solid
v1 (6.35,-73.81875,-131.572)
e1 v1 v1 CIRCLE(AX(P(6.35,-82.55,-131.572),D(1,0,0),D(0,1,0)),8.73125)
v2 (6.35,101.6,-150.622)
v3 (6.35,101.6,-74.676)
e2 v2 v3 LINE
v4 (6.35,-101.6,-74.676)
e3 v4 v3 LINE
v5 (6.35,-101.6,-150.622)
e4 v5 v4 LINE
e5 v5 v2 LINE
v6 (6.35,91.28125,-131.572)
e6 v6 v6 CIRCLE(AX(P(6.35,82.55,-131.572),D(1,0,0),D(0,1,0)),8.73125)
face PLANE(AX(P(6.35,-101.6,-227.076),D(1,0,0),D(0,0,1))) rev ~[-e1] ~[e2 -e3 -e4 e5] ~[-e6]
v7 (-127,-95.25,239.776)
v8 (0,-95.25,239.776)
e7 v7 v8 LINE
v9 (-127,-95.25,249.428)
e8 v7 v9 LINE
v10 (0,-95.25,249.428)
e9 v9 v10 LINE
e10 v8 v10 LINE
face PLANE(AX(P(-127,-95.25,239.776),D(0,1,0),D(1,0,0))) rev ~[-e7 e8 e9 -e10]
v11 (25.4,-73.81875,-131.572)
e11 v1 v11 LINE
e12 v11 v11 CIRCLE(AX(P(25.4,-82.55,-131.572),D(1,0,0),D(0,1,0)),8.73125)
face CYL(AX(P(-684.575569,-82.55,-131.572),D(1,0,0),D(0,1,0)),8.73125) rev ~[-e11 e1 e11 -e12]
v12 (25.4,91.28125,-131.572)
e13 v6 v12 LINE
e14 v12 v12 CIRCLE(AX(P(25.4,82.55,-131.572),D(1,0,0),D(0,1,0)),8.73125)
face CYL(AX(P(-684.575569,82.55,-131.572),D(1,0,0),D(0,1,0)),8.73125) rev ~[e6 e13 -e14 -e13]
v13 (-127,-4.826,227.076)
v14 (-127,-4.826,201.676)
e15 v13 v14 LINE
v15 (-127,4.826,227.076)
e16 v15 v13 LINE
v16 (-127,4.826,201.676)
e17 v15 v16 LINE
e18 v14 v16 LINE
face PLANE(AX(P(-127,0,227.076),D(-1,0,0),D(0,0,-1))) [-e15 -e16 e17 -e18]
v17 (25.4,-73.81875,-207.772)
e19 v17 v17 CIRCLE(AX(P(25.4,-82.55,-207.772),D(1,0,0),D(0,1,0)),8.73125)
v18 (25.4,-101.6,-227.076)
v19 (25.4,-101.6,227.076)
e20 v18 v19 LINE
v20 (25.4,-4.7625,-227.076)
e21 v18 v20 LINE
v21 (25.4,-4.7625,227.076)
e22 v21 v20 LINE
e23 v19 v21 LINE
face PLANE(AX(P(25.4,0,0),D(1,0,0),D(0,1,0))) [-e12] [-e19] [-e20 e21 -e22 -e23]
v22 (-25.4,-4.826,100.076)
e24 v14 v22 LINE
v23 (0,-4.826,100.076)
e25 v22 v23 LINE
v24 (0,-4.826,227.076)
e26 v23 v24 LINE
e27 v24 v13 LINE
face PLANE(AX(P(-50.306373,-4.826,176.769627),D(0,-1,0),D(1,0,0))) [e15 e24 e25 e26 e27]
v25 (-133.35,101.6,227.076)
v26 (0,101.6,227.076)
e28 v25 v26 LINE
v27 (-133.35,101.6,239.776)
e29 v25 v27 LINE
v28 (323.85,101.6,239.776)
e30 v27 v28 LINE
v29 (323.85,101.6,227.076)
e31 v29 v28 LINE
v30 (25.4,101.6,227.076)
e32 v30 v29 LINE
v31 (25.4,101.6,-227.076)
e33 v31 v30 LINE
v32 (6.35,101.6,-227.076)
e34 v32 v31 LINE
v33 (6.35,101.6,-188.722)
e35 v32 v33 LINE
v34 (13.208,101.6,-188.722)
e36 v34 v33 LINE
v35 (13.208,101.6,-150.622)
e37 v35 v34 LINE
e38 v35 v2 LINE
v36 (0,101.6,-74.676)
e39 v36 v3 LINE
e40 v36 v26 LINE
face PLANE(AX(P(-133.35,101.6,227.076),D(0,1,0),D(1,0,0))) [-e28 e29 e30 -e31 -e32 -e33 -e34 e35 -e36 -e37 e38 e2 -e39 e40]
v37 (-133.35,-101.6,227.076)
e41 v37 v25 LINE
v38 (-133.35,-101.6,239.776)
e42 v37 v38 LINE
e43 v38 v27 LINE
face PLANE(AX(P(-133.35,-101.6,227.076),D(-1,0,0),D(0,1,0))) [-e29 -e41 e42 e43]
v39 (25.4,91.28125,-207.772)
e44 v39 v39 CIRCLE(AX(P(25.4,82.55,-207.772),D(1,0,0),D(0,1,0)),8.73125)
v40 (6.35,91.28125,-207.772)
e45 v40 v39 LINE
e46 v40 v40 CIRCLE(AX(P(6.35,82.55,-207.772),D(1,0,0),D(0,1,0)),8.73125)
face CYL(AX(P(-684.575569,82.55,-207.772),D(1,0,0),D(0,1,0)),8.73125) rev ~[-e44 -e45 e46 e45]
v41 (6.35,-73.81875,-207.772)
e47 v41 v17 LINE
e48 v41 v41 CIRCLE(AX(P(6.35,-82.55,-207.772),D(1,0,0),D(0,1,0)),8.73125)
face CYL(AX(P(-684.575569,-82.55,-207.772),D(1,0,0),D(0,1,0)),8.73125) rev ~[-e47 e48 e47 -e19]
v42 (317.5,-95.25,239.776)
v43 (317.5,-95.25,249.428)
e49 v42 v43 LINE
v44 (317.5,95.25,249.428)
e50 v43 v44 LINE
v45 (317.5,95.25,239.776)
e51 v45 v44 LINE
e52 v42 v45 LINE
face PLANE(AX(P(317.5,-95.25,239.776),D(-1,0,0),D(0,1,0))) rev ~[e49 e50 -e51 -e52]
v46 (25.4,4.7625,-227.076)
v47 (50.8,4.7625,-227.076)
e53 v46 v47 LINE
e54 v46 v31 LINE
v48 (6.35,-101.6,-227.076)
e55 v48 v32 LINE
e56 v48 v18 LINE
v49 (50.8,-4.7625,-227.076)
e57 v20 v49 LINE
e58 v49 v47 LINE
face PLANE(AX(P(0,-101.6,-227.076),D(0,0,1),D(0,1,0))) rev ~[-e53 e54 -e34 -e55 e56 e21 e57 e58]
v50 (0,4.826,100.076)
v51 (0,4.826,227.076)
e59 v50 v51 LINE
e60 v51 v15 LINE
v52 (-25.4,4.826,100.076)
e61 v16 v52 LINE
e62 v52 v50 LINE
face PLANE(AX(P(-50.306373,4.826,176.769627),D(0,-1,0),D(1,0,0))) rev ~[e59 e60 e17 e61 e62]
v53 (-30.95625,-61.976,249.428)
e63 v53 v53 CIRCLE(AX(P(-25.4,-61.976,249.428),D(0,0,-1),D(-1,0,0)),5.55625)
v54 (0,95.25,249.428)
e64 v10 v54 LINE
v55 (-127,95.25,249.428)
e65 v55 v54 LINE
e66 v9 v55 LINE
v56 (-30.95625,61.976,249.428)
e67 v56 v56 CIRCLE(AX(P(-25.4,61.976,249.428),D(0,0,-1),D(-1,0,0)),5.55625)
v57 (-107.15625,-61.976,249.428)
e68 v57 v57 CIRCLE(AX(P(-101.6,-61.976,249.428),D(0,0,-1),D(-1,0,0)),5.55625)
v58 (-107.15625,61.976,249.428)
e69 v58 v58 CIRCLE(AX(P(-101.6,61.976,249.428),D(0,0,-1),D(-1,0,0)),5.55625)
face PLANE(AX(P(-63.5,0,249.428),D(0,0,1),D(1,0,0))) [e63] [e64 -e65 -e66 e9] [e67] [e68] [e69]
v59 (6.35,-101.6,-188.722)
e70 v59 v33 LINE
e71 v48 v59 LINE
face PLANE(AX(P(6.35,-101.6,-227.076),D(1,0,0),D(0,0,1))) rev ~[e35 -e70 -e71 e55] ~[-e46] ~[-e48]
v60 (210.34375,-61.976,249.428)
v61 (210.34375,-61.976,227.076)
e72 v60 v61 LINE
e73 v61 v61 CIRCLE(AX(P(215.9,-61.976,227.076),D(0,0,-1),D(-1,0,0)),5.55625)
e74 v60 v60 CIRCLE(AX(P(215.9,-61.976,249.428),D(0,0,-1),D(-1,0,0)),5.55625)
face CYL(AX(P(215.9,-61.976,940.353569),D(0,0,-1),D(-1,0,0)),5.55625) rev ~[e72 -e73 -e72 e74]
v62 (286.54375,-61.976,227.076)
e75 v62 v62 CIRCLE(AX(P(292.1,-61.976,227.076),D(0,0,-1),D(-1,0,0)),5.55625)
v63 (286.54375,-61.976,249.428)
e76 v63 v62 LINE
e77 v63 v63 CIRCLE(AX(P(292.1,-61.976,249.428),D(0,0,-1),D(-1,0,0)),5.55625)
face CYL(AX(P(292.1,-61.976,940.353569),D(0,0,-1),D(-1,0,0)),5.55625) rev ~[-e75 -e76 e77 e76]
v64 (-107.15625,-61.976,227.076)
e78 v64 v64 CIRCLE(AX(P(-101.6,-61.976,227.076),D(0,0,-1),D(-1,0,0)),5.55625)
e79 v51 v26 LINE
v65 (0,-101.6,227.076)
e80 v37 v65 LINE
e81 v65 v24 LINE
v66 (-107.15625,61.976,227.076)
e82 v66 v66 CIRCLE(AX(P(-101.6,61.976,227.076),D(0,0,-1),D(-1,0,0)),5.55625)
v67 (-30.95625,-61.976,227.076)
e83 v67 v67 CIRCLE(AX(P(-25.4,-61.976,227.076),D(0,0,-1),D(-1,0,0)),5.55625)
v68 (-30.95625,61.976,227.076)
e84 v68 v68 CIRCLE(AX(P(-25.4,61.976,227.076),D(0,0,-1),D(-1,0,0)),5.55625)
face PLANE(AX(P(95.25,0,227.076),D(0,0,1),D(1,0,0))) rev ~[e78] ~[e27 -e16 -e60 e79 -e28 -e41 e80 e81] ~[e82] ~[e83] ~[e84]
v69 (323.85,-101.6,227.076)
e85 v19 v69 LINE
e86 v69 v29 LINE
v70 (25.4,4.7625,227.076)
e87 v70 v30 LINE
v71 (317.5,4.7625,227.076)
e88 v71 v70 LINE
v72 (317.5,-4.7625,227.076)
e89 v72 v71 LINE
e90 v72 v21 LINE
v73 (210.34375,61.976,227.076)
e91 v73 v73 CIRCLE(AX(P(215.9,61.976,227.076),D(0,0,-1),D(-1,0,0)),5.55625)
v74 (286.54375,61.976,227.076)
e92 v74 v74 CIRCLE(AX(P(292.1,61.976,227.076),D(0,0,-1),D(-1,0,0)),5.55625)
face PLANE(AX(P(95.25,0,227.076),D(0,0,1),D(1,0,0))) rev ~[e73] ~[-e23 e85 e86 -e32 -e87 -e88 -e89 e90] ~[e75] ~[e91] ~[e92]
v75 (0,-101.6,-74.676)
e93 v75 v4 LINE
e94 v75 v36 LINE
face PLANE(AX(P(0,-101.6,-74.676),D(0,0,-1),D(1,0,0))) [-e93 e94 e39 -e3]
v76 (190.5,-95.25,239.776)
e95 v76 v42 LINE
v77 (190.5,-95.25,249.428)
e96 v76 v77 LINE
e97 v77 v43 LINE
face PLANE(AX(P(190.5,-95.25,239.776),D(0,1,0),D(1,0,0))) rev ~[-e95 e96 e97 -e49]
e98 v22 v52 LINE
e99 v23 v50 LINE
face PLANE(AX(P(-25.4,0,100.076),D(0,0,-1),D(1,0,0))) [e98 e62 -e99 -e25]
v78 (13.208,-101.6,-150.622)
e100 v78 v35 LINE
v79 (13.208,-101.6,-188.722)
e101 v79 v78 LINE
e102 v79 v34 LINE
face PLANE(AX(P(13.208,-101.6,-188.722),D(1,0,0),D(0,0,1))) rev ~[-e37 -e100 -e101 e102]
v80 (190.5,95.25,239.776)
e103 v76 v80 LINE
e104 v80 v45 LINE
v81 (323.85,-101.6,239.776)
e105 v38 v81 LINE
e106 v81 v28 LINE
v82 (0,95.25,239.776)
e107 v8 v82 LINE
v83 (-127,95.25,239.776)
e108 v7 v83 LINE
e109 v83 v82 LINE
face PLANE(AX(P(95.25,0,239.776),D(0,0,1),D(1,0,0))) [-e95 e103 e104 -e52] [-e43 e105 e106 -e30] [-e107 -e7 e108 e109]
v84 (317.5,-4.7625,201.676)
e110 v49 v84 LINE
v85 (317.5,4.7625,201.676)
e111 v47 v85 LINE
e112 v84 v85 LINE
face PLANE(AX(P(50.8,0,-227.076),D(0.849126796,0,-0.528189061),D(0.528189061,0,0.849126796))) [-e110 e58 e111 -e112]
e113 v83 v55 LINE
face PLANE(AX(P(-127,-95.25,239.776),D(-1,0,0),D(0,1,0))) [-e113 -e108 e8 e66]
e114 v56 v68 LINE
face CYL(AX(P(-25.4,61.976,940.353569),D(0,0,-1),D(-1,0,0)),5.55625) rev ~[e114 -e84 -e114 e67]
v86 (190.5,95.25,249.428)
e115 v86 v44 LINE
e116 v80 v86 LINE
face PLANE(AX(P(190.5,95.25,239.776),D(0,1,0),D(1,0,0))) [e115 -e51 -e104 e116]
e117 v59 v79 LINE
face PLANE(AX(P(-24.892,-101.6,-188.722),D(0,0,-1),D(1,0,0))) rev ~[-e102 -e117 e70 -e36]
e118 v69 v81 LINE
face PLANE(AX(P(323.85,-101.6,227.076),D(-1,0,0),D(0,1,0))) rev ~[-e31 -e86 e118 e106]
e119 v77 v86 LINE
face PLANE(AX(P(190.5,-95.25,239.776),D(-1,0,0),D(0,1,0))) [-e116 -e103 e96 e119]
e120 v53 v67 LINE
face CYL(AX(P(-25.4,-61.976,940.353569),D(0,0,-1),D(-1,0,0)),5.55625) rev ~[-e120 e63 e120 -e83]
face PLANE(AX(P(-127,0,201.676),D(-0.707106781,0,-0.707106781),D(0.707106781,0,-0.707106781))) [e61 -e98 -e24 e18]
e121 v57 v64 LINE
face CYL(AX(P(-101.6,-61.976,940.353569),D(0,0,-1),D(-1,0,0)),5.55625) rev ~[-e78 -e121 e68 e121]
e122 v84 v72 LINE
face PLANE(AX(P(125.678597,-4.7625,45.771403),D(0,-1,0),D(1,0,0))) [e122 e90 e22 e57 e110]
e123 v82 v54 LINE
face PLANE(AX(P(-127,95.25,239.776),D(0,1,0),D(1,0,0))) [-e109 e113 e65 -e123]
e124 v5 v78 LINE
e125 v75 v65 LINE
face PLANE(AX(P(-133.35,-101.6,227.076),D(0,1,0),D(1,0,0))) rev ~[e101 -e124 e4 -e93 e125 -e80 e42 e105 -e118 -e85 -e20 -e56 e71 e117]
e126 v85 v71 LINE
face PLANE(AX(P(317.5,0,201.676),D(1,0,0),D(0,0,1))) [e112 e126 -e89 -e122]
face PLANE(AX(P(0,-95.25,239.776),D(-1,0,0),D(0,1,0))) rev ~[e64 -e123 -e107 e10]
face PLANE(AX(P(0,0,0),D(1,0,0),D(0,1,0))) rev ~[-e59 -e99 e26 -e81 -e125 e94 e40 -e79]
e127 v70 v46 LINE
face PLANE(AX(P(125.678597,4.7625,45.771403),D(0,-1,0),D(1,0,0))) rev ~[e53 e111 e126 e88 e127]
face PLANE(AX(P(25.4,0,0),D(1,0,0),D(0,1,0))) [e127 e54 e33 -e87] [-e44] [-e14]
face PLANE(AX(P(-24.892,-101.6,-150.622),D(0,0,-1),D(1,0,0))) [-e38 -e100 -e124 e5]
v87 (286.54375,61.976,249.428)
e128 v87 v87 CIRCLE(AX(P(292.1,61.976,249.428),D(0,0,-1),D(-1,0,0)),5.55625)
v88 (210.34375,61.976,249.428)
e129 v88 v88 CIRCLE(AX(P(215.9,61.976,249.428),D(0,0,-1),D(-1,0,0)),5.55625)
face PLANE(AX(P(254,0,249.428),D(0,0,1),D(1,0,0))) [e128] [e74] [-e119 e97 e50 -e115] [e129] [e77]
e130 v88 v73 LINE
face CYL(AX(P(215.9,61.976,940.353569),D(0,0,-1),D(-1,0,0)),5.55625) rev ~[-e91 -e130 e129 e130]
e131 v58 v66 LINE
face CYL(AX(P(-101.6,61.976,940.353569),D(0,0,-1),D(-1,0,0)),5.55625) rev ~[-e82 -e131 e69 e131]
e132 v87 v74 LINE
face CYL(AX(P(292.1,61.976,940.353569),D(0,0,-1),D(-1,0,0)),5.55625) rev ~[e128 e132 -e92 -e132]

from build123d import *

# Parameters (mm, degrees)
F0_W      = 203.2
F0_H      = 454.152
F1_DEPTH  = 25.4
F2_W      = 6.35
F2_H      = 152.4
F3_DEPTH  = 203.201
F4_W      = 457.2
F4_H      = 203.2
F5_DEPTH  = 12.7
F6_W      = 127
F6_H      = 190.5
F7_DEPTH  = 9.652
F9_D      = 11.1125
F11_DEPTH = 4.7625
F12_W     = 38.1
F12_H     = 38.1
F13_DEPTH = 203.201
F15_D     = 17.4625
F17_DEPTH = 4.826


# Not quite as in the source:
# - a length typed as a fraction of an inch, garbled in the dataset ("3 / 203.2 mm" for 3/8 in), is restored


with BuildPart() as f1:
    # F0 (on Right) → F1 (new body)
    with BuildSketch(Plane.YZ):
        Rectangle(F0_W, F0_H)
    extrude(amount=F1_DEPTH)

    # F2 (on face) → F3 (cut, through all)
    with BuildSketch(Plane.XZ.offset(101.6)):
        with Locations((3.175, -150.876)):
            Rectangle(F2_W, F2_H)
    extrude(amount=-F3_DEPTH, mode=Mode.SUBTRACT)

    # F4 (on face) → F5 (join)
    with BuildSketch(Plane.XY.offset(227.076)):
        with Locations((95.25, 0)):
            Rectangle(F4_W, F4_H)
    extrude(amount=F5_DEPTH)

    # F6 (on face) → F7 (join)
    with BuildSketch(Plane.XY.offset(239.776)):
        with Locations((-63.5, 0)):
            Rectangle(F6_W, F6_H)
        with Locations((254, 0)):
            Rectangle(F6_W, F6_H)
    extrude(amount=F7_DEPTH)

    # F9 (through all)
    with Locations(Plane.XY.offset(249.428)):
        with Locations((-101.6, 61.976), (-25.4, 61.976), (-101.6, -61.976), (-25.4, -61.976), (215.9, 61.976), (292.1, 61.976), (215.9, -61.976), (292.1, -61.976)):
            Hole(F9_D / 2)

    # F10 (on Front) → F11 (join, symmetric)
    with BuildSketch(Plane.XZ):
        Polygon((317.5, 227.076), (25.4, 227.076), (25.4, -227.076), (50.8, -227.076), (317.5, 201.676), align=None)
    extrude(amount=F11_DEPTH, both=True)

    # F12 (on face) → F13 (cut, through all)
    with BuildSketch(Plane.XZ.offset(101.6)):
        with Locations((-5.842, -169.672)):
            Rectangle(F12_W, F12_H)
    extrude(amount=-F13_DEPTH, mode=Mode.SUBTRACT)

    # F15 (through all)
    with Locations(Plane(origin=(6.35, 0, 0), x_dir=(0, -1, 0), z_dir=(-1, 0, 0))):
        with Locations((-82.55, -131.572), (82.55, -131.572), (82.55, -207.772), (-82.55, -207.772)):
            Hole(F15_D / 2)

    # F16 (on Front) → F17 (join, symmetric)
    with BuildSketch(Plane.XZ):
        Polygon((0, 100.076), (0, 227.076), (-127, 227.076), (-127, 201.676), (-25.4, 100.076), align=None)
    extrude(amount=F17_DEPTH, both=True)


solid = f1.part
